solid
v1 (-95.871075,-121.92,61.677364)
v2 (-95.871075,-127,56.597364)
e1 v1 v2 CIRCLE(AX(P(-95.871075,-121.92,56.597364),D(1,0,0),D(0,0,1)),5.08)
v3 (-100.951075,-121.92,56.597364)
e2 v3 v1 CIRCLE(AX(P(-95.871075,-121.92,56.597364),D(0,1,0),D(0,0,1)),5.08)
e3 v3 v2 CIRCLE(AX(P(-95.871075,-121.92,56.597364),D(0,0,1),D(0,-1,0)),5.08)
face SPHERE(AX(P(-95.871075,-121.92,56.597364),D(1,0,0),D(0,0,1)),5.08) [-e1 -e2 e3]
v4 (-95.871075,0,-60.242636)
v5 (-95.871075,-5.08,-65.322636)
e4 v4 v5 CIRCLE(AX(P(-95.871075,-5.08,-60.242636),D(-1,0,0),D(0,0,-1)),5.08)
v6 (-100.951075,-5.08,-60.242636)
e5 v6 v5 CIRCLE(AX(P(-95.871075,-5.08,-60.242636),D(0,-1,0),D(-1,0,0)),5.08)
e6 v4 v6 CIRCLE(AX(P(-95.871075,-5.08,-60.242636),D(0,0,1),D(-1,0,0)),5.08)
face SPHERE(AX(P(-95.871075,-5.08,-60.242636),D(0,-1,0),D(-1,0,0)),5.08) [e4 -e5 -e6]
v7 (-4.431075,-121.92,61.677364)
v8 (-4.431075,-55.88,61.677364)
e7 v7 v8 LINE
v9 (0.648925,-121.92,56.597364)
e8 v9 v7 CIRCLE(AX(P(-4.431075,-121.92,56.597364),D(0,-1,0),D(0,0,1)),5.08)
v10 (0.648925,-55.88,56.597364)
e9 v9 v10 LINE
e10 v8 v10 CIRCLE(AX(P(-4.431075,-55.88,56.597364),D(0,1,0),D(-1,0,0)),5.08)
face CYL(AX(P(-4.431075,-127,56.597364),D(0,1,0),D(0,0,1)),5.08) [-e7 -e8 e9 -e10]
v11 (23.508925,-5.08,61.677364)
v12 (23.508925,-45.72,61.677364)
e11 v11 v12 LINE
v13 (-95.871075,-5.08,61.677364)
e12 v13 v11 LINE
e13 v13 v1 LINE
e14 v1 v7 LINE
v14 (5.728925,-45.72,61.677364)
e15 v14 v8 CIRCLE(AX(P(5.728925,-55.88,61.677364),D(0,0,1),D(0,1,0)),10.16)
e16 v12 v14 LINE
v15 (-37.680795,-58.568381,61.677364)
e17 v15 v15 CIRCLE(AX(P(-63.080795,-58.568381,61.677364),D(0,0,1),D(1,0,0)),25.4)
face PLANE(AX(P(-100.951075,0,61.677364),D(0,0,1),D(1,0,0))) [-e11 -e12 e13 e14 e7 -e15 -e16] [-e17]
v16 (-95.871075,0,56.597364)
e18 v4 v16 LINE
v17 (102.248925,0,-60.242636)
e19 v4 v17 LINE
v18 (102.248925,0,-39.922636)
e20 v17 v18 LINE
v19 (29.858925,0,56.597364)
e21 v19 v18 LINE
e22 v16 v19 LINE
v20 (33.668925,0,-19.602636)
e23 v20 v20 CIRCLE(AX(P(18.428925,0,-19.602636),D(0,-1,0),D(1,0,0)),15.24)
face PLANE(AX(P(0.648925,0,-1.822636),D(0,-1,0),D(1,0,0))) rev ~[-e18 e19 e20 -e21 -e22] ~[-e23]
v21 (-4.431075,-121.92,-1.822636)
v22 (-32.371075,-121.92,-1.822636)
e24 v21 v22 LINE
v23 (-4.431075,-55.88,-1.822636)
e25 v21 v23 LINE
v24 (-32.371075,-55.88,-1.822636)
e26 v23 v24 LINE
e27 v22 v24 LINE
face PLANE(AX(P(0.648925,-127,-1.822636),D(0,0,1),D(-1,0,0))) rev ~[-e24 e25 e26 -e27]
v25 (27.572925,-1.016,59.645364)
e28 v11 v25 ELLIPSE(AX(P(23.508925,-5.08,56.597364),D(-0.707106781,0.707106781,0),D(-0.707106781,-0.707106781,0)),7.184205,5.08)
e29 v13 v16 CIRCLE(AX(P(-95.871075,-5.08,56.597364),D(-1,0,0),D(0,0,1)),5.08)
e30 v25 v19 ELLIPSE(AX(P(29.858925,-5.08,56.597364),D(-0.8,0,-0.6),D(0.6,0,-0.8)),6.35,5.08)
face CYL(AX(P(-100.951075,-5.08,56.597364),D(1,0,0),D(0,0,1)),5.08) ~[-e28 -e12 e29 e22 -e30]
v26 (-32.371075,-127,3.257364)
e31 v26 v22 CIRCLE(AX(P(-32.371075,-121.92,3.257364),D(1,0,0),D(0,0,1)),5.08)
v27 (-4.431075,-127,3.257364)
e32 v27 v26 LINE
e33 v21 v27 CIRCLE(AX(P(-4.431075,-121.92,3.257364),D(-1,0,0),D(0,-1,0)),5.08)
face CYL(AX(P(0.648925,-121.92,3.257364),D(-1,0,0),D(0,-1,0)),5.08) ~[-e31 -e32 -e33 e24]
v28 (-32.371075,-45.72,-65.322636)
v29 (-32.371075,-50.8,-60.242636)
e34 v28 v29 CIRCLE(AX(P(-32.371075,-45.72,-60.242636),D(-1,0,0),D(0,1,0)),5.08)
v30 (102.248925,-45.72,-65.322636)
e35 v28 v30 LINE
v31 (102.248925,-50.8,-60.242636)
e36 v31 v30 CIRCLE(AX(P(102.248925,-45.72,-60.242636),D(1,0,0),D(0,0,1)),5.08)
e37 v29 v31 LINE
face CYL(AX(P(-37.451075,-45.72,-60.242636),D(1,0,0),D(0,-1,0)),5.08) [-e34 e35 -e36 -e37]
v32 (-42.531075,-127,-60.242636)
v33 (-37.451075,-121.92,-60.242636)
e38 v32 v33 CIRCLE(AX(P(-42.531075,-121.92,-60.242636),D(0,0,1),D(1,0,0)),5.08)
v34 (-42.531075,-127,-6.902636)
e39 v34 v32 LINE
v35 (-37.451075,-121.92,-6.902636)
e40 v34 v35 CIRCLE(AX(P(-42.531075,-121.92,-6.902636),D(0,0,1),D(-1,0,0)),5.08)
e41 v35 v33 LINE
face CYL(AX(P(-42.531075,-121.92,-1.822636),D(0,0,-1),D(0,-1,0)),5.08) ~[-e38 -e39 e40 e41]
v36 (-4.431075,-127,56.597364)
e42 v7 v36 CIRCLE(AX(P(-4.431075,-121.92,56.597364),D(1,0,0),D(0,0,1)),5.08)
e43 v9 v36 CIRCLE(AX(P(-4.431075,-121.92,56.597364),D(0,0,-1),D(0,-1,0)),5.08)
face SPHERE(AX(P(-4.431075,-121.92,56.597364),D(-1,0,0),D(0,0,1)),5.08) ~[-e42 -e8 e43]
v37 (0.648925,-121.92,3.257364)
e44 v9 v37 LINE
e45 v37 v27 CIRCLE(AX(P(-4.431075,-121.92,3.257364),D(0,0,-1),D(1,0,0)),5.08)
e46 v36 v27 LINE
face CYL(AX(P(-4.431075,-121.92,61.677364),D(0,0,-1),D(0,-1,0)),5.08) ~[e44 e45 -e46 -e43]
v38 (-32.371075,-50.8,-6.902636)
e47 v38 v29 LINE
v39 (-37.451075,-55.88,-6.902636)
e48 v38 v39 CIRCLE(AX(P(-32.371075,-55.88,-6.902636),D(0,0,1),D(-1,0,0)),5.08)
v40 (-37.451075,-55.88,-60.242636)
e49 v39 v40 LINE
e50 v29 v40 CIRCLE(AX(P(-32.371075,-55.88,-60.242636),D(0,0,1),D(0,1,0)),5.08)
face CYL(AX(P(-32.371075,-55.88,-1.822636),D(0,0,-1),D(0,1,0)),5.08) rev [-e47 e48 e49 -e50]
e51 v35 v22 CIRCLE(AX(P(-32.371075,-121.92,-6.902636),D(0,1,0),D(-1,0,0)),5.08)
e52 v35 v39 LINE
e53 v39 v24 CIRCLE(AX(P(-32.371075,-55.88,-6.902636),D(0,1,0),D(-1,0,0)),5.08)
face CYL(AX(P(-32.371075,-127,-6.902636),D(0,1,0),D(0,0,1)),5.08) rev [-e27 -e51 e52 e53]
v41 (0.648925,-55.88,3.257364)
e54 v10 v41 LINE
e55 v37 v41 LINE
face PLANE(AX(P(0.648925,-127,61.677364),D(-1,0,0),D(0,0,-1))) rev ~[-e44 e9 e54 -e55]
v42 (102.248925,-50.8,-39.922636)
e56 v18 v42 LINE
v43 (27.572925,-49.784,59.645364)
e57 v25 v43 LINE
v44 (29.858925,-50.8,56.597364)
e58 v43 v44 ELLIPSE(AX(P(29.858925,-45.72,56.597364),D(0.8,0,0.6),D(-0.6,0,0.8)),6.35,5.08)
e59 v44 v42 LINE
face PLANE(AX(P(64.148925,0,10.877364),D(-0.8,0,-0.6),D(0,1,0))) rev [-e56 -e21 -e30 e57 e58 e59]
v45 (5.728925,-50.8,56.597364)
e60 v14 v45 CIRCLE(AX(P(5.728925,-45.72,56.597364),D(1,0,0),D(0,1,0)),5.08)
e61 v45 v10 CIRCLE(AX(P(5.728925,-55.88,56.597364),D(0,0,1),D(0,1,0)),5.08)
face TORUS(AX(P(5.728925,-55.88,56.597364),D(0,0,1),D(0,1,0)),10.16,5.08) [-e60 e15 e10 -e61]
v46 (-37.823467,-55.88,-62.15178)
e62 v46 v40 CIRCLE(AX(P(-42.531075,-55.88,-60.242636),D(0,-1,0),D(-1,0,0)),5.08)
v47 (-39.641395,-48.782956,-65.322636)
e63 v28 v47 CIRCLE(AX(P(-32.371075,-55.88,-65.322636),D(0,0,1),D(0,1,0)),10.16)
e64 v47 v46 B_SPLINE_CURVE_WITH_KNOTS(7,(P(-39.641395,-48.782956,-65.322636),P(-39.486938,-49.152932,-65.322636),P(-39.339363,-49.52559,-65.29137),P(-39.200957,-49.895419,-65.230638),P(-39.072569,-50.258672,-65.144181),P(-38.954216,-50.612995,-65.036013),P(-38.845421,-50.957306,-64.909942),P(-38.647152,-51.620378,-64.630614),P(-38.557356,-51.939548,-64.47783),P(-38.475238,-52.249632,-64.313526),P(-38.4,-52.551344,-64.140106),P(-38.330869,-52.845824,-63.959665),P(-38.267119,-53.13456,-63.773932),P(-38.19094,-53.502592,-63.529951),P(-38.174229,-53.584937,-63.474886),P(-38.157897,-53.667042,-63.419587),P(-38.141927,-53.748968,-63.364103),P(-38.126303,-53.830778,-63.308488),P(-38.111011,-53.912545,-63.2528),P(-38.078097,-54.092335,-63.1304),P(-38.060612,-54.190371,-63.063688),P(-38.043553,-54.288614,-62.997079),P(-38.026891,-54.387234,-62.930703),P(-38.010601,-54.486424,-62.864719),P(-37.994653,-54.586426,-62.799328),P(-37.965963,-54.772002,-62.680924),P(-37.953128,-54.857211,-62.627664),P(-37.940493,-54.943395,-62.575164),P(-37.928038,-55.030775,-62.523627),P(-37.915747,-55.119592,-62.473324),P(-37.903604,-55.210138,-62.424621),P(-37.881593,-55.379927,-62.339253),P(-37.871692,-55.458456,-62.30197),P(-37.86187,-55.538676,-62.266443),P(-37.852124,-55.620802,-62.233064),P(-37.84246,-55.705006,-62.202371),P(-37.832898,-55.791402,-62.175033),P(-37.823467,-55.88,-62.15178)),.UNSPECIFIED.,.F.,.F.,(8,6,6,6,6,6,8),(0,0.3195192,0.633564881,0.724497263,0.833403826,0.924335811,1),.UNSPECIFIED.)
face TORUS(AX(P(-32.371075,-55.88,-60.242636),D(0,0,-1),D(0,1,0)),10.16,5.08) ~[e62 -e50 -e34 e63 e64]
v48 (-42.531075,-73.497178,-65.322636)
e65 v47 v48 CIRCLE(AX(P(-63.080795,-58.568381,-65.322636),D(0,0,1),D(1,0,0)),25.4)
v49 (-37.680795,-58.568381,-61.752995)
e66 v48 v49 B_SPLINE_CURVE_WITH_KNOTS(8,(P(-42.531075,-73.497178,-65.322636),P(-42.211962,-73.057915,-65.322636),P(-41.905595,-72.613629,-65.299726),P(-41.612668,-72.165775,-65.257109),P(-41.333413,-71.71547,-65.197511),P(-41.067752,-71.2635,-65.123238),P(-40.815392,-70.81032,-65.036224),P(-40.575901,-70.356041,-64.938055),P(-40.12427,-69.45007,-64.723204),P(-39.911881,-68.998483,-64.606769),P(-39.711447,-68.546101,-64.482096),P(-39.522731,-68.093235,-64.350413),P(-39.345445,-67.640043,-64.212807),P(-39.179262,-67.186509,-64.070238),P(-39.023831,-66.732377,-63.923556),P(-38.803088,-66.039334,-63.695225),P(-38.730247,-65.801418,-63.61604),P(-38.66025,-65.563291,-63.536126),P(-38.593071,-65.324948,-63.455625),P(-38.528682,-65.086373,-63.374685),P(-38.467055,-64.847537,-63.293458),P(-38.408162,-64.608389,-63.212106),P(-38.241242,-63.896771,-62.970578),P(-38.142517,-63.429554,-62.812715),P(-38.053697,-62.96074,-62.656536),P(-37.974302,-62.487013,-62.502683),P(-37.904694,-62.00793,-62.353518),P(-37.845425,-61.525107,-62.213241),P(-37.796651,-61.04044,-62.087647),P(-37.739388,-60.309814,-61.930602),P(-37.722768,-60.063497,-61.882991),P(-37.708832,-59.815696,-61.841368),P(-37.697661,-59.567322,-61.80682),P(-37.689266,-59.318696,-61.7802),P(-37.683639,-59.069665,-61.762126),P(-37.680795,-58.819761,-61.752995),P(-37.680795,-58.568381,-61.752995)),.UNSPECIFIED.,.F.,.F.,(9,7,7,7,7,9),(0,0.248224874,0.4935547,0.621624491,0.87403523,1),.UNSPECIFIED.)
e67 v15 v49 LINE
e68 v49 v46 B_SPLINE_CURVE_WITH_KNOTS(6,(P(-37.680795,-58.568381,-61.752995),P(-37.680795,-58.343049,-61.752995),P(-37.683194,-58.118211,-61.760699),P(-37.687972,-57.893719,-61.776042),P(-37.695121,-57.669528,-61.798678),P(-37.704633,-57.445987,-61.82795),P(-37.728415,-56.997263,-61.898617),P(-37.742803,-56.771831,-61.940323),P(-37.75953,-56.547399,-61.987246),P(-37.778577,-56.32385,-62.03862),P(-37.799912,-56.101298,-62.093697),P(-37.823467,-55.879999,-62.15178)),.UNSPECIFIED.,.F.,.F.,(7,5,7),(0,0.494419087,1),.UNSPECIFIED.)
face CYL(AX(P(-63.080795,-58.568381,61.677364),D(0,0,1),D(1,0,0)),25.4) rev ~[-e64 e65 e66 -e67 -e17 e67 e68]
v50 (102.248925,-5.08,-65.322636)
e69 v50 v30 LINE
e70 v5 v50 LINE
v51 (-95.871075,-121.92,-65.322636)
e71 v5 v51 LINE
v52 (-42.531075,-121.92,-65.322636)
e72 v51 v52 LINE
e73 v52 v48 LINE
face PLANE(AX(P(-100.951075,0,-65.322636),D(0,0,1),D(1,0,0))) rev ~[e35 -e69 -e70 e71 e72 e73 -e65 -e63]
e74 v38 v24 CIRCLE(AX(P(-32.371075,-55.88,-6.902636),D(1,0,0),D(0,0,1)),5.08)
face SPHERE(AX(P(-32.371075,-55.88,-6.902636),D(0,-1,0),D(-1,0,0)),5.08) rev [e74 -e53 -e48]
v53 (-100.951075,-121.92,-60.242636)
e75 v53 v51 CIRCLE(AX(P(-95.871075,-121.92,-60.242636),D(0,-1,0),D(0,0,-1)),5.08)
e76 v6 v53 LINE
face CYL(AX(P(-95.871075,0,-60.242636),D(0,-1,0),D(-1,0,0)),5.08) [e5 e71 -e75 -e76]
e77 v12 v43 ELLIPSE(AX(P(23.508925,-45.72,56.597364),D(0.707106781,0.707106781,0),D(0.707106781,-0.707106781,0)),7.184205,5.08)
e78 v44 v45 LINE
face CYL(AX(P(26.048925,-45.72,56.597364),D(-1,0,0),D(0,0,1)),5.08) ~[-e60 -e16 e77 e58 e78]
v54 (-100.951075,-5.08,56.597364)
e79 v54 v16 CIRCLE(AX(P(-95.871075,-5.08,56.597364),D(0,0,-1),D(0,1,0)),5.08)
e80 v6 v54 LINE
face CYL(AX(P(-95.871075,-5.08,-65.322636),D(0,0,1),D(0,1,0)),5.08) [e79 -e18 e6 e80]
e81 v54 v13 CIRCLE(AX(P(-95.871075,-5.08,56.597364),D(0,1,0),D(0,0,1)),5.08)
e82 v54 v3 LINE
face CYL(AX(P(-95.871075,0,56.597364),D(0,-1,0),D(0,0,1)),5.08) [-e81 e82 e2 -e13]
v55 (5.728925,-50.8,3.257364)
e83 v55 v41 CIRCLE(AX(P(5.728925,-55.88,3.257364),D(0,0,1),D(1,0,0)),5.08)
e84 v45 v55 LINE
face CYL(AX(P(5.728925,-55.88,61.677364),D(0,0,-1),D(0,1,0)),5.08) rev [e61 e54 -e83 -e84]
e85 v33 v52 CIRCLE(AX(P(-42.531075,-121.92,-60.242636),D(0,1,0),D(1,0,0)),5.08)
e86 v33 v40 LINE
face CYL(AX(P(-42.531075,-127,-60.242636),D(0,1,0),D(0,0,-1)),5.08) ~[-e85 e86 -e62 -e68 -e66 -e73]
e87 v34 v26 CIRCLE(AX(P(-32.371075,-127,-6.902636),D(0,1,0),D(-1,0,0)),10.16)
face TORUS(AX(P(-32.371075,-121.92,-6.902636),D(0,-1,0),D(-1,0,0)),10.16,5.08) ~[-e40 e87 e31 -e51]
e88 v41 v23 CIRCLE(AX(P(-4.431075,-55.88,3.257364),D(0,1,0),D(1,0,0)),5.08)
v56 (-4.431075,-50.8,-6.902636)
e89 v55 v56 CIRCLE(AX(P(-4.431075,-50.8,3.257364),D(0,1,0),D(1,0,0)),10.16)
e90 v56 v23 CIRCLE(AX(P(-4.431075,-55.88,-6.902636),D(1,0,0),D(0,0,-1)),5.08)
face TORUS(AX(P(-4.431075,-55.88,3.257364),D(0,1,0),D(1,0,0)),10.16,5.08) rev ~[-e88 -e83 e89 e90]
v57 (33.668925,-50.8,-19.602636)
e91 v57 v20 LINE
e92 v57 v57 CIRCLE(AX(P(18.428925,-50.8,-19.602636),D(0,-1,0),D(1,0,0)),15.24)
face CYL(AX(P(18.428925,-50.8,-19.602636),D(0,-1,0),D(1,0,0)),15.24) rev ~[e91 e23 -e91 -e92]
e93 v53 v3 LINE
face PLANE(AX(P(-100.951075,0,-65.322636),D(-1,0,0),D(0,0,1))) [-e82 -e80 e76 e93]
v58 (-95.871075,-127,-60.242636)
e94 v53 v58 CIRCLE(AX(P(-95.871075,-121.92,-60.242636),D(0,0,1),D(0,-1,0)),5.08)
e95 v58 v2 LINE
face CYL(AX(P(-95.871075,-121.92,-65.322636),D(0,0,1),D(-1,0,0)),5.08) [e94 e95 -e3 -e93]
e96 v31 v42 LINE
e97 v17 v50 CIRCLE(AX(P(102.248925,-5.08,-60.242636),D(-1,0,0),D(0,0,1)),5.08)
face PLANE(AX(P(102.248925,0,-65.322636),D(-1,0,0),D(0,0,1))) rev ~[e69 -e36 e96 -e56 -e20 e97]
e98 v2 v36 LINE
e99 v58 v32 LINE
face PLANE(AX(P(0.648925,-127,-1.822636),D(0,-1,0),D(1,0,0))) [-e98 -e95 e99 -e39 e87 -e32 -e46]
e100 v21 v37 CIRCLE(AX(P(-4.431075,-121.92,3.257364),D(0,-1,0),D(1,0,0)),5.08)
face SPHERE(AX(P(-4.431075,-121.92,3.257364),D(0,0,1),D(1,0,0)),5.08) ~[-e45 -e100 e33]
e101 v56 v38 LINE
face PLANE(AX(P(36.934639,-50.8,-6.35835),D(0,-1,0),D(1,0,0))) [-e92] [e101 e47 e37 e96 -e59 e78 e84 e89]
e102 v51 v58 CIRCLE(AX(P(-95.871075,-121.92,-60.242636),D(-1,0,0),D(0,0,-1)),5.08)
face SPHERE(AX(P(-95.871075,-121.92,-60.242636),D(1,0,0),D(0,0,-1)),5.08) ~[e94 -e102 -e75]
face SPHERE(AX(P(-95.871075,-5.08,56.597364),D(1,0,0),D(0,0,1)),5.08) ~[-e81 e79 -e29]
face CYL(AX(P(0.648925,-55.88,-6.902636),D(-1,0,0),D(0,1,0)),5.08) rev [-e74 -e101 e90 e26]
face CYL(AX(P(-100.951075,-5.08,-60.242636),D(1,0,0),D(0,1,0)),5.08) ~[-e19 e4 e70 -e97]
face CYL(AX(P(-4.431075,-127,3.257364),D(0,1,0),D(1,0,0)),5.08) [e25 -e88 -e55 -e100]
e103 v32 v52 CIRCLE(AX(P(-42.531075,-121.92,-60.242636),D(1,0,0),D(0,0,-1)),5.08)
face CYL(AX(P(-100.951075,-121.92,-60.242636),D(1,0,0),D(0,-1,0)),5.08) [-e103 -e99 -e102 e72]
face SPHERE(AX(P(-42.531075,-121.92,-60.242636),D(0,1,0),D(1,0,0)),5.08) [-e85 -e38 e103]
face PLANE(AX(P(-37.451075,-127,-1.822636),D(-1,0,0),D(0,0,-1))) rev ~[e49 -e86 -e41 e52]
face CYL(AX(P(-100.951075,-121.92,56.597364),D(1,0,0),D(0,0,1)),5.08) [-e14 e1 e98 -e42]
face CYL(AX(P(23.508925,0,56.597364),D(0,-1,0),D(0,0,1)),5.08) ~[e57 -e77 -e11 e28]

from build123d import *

# Parameters (mm, degrees)
F0_W     = 203.2
F0_H     = 127
F1_DEPTH = 127
F3_DEPTH = 76.2
F4_SIZE2 = 101.6
F4_SIZE  = 76.2
F5_R     = 5.08
F6_R     = 15.24
F7_DEPTH = 50.8
F8_R     = 25.4
F9_DEPTH = 127


with BuildPart() as f1:
    # F0 (on Front) → F1 (new body)
    with BuildSketch(Plane.XZ):
        with Locations((0.6489251732, -1.8226355314)):
            Rectangle(F0_W, F0_H)
    extrude(amount=F1_DEPTH)

    # F2 (on face) → F3 (cut)
    with BuildSketch(Plane.XZ.offset(127)):
        Polygon((102.2489251732, 61.6773644686), (0.6489251732, 61.6773644686), (0.6489251732, -1.8226355314), (-37.4510748268, -1.8226355314), (-37.4510748268, -65.3226355314), (102.2489251732, -65.3226355314), align=None)
    extrude(amount=-F3_DEPTH, mode=Mode.SUBTRACT)

    # F4
    f4_edges = [f1.edges().sort_by_distance(p)[0] for p in [
        (102.248925, -25.4, 61.677364),
    ]]
    f4_side = f1.faces().sort_by_distance((-21.122503, -52.614286, 61.677364))[0]
    chamfer(f4_edges, length=F4_SIZE, length2=F4_SIZE2, reference=f4_side)

    # F5
    f5_edges = [f1.edges().sort_by_distance(p)[0] for p in [
        (-50.151075, -127, 61.677364),
        (-37.451075, 0, 61.677364),
        (26.048925, -25.4, 61.677364),
        (-100.951075, -63.5, 61.677364),
        (13.348925, -50.8, 61.677364),
        (0.648925, -88.9, 61.677364),
        (0.648925, -127, 29.927364),
        (0.648925, -88.9, -1.822636),
        (0.648925, -50.8, 29.927364),
        (-37.451075, -88.9, -1.822636),
        (-37.451075, -88.9, -65.322636),
        (-37.451075, -127, -33.572636),
        (-37.451075, -50.8, -33.572636),
        (-69.201075, -127, -65.322636),
        (-100.951075, -63.5, -65.322636),
        (-100.951075, 0, -1.822636),
        (-100.951075, -127, -1.822636),
        (0.648925, 0, -65.322636),
        (32.398925, -50.8, -65.322636),
        (-18.401075, -50.8, -1.822636),
        (-18.401075, -127, -1.822636),
    ]]
    fillet(f5_edges, radius=F5_R)

    # F6 (on face) → F7 (cut, through all)
    with BuildSketch(Plane.XZ.offset(50.8)):
        with Locations((18.4289251732, -19.6026355314)):
            Circle(F6_R)
    extrude(amount=-F7_DEPTH, mode=Mode.SUBTRACT)

    # F8 (on face) → F9 (cut, through all)
    with BuildSketch(Plane.XY.offset(61.6773644686)):
        with Locations((-63.0807951093, -58.5683807731)):
            Circle(F8_R)
    extrude(amount=-F9_DEPTH, mode=Mode.SUBTRACT)


solid = f1.part
